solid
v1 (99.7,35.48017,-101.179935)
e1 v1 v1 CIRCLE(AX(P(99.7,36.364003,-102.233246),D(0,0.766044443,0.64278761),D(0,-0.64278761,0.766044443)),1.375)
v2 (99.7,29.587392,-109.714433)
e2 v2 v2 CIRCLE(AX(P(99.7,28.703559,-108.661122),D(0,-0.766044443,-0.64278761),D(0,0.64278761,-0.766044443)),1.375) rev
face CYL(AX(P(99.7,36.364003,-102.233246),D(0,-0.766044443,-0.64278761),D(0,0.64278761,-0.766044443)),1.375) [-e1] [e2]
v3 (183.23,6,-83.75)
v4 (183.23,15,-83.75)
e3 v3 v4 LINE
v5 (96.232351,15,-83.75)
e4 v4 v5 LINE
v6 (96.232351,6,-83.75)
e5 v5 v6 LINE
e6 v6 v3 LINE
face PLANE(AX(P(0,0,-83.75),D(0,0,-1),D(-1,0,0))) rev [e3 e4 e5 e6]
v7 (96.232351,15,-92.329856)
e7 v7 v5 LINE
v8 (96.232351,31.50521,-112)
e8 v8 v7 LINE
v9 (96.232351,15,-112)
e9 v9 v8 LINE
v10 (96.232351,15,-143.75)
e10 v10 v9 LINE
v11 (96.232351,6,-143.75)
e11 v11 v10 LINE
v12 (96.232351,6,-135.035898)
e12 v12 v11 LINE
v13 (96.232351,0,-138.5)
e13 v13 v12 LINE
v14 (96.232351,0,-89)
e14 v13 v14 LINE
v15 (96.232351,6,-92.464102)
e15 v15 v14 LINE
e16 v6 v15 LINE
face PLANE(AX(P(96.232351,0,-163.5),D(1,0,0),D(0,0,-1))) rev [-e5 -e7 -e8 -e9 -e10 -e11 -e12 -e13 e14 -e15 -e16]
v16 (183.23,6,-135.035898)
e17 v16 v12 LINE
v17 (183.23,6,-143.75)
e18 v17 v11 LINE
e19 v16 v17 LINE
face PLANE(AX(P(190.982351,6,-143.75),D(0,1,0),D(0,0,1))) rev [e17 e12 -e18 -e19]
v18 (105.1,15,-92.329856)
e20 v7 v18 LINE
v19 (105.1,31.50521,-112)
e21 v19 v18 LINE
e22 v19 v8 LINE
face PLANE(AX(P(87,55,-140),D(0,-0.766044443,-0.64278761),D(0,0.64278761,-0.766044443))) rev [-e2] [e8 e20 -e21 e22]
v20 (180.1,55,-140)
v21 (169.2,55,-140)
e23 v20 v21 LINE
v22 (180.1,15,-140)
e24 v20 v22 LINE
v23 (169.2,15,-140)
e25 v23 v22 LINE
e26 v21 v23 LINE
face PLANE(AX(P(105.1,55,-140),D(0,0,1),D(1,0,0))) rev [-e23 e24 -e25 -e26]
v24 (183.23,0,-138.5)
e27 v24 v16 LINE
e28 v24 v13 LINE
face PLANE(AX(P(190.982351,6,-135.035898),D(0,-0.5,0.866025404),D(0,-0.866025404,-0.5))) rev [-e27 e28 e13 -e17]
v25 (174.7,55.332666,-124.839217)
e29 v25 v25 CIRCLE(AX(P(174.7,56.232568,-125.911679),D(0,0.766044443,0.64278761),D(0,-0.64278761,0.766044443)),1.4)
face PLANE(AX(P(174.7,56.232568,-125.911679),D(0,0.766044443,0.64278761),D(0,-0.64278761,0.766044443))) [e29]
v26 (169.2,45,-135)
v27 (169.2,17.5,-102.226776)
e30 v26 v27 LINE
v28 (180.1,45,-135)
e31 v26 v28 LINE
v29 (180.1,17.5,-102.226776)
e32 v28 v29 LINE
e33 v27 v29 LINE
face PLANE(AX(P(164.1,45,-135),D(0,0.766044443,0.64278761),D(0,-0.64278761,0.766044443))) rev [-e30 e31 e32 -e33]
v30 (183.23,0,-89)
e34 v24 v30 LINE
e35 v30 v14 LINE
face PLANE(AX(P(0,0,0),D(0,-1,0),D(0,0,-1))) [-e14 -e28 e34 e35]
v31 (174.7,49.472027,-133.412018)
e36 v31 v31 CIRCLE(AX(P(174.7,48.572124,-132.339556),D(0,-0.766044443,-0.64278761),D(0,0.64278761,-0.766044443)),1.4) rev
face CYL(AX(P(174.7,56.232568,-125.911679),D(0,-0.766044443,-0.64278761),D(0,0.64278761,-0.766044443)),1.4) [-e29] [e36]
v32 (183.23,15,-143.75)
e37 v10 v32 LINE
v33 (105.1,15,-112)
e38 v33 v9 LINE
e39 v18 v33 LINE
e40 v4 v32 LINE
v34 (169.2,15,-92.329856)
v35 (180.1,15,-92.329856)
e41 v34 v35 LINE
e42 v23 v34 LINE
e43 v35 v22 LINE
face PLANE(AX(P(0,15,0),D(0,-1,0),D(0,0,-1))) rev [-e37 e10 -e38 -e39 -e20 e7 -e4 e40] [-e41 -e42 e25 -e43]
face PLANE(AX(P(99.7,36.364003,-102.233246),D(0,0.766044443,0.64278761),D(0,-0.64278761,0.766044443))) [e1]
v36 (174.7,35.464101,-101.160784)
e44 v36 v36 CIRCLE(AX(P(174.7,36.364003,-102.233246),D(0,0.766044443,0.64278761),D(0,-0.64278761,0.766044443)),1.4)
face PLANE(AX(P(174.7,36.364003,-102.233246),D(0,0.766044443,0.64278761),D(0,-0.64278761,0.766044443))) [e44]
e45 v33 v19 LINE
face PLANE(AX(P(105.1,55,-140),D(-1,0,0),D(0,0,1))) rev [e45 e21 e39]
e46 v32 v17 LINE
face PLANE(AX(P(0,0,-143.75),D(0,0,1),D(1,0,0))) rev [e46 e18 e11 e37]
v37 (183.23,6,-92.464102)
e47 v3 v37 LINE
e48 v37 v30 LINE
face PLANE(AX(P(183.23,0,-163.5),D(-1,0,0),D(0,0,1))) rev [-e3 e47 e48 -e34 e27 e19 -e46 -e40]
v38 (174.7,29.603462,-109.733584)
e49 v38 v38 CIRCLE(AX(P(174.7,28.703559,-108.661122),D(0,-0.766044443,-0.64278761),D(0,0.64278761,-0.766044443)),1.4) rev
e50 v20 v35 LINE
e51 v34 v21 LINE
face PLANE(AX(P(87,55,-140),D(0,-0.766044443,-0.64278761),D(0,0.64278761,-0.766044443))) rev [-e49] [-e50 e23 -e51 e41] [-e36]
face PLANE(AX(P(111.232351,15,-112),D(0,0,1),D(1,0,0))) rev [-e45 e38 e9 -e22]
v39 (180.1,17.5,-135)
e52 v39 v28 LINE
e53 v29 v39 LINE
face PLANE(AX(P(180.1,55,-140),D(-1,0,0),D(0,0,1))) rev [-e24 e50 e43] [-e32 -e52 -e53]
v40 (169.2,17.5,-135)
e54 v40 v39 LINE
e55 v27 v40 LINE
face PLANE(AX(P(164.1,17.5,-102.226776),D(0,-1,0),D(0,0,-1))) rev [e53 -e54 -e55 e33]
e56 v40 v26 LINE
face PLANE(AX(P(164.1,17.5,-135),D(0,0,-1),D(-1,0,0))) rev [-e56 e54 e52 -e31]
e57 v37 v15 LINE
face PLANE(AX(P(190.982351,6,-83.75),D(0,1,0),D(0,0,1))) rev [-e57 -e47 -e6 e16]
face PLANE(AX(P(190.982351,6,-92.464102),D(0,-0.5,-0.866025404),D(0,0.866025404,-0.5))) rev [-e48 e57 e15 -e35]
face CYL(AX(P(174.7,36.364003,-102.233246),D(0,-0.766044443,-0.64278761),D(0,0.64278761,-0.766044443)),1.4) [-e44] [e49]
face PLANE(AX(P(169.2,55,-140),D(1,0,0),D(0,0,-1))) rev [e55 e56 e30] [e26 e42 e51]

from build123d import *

# Parameters (mm, degrees)
SKETCH1_W              = 196
SKETCH1_H              = 150
BOSS_EXTRUDE1_DEPTH    = 15
SKETCH2_W              = 166
SKETCH2_H              = 55
CUT_EXTRUDE1_DEPTH     = 9.68
SKETCH3_R              = 1.5
BOSS_EXTRUDE2_DEPTH    = 10
SKETCH4_W              = 10.9
SKETCH4_H              = 64
BOSS_EXTRUDE3_DEPTH    = 40
CUT_EXTRUDE2_DEPTH     = 109
SKETCH6_R              = 1.4
SKETCH6_R_2            = 1.375
BOSS_EXTRUDE4_DEPTH    = 10
FILLET1_R              = 10
CUT_EXTRUDE4_START     = -15
CUT_EXTRUDE4_OUTLINE_R = 1.5
CUT_EXTRUDE4_DEPTH     = 15
SKETCH10_W             = 60
SKETCH10_H             = 37
CUT_EXTRUDE5_DEPTH     = 83
SKETCH11_W             = 10
SKETCH11_H             = 52.5
CUT_EXTRUDE6_DEPTH     = 36
SKETCH13_W             = 28
SKETCH13_H             = 42.5
CUT_EXTRUDE7_DEPTH     = 19
SKETCH19_W             = 4
SKETCH19_H             = 55
SKETCH19_W_2           = 2.77
SKETCH19_H_2           = 50
CUT_EXTRUDE9_DEPTH     = 76
SKETCH21_W             = 86.997648927
SKETCH21_H             = 15
BOSS_EXTRUDE6_DEPTH    = 3.75
SKETCH22_W             = 86.997648927
SKETCH22_H             = 15
BOSS_EXTRUDE7_DEPTH    = 3.75
CUT_EXTRUDE11_DEPTH    = 94.75
CUT_EXTRUDE12_DEPTH    = 16


# Read off the part's stored shape, not the designer's step: Cut-Extrude4
with BuildPart() as part:
    # Sketch1 → Boss-Extrude1 (new body)
    with BuildSketch(Plane(origin=(0, 0, 0), x_dir=(1, 0, 0), z_dir=(0, 1, 0))):
        with Locations((98, 75)):
            Rectangle(SKETCH1_W, SKETCH1_H)
    extrude(amount=BOSS_EXTRUDE1_DEPTH)

    # Sketch2 → Cut-Extrude1 (cut)
    with BuildSketch(Plane(origin=(0, 15, 0), x_dir=(1, 0, 0), z_dir=(0, 1, 0))):
        with Locations((98, 42.5)):
            Rectangle(SKETCH2_W, SKETCH2_H)
    extrude(amount=-CUT_EXTRUDE1_DEPTH, mode=Mode.SUBTRACT)

    # Sketch3 → Boss-Extrude2 (add)
    with BuildSketch(Plane(origin=(0, 15, 0), x_dir=(1, 0, 0), z_dir=(0, 1, 0))):
        with Locations(Location((25, 133.2, 0), (0, 0, 90))):
            Circle(SKETCH3_R)
        with Locations(Location((23.7, 85, 0), (0, 0, 90))):
            Circle(SKETCH3_R)
        with Locations(Location((75.8, 118, 0), (0, 0, 90))):
            Circle(SKETCH3_R)
        with Locations(Location((75.8, 90.1, 0), (0, 0, 90))):
            Circle(SKETCH3_R)
    extrude(amount=BOSS_EXTRUDE2_DEPTH)

    # Sketch4 → Boss-Extrude3 (add)
    with BuildSketch(Plane(origin=(0, 15, 0), x_dir=(1, 0, 0), z_dir=(0, 1, 0))):
        with Locations((99.65, 108)):
            Rectangle(SKETCH4_W, SKETCH4_H)
        with Locations((174.65, 108)):
            Rectangle(SKETCH4_W, SKETCH4_H)
    extrude(amount=BOSS_EXTRUDE3_DEPTH)

    # Sketch5 → Cut-Extrude2 (cut)
    with BuildSketch(Plane(origin=(196, 0, 0), x_dir=(0, 0, -1), z_dir=(1, 0, 0))):
        Polygon((140, 55), (92.329856296, 15), (75, 15), (75, 55), align=None)
    extrude(amount=-CUT_EXTRUDE2_DEPTH, mode=Mode.SUBTRACT)

    # Sketch6 → Boss-Extrude4 (add)
    with BuildSketch(Plane(origin=(0, -36.661217825, -30.762414355), x_dir=(1, 0, 0), z_dir=(0, 0.7660444431189771, 0.6427876096865404))):
        with Locations(Location((174.7, 132.599540569, 0), (0, 0, 90))):
            Circle(SKETCH6_R)
        with Locations(Location((174.7, 101.689540569, 0), (0, 0, 90))):
            Circle(SKETCH6_R)
        with Locations(Location((99.7, 132.599540569, 0), (0, 0, 90))):
            Circle(SKETCH6_R_2)
        with Locations(Location((99.7, 101.689540569, 0), (0, 0, 90))):
            Circle(SKETCH6_R_2)
    extrude(amount=BOSS_EXTRUDE4_DEPTH)

    # Fillet1
    fillet1_edges = [part.edges().sort_by_distance(p)[0] for p in [
        (196, 15, -75),
        (98, 15, -150),
        (0, 15, -75),
        (98, 15, 0),
    ]]
    fillet(fillet1_edges, radius=FILLET1_R - 0.0001)  # a hair under: the kernel refuses the full size

    # Cut-Extrude4 outline → Cut-Extrude4 (cut)
    with BuildSketch(Plane(origin=(0, 15, 0), x_dir=(1, 0, 0), z_dir=(0, 1, 0)).offset(CUT_EXTRUDE4_START)):
        Polygon((92.232351073, 87.5), (92.232351073, 140), (196, 140), (196, 150), (0, 150), (0, 0), (196, 0), (196, 87.5), align=None)
        with Locations((23.7, 85)):
            Circle(CUT_EXTRUDE4_OUTLINE_R, mode=Mode.SUBTRACT)
        with Locations((75.8, 90.1)):
            Circle(CUT_EXTRUDE4_OUTLINE_R, mode=Mode.SUBTRACT)
        with Locations((25, 133.2)):
            Circle(CUT_EXTRUDE4_OUTLINE_R, mode=Mode.SUBTRACT)
        with Locations((75.8, 118)):
            Circle(CUT_EXTRUDE4_OUTLINE_R, mode=Mode.SUBTRACT)
    extrude(amount=CUT_EXTRUDE4_DEPTH, mode=Mode.SUBTRACT)

    # Sketch10 → Cut-Extrude5 (cut)
    with BuildSketch(Plane.ZY.offset(-92.232351073)):
        with Locations((-110, 18.5)):
            Rectangle(SKETCH10_W, SKETCH10_H)
    extrude(amount=CUT_EXTRUDE5_DEPTH, mode=Mode.SUBTRACT)

    # Sketch11 → Cut-Extrude6 (cut)
    with BuildSketch(Plane(origin=(0, 15, 0), x_dir=(1, 0, 0), z_dir=(0, 1, 0))):
        with Locations((191, 113.75)):
            Rectangle(SKETCH11_W, SKETCH11_H)
    extrude(amount=-CUT_EXTRUDE6_DEPTH, mode=Mode.SUBTRACT)

    # Sketch13 → Cut-Extrude7 (cut)
    with BuildSketch(Plane.ZY.offset(-92.232351073)):
        with Locations((-126, 36.25)):
            Rectangle(SKETCH13_W, SKETCH13_H)
    extrude(amount=-CUT_EXTRUDE7_DEPTH, mode=Mode.SUBTRACT)

    # Sketch19 → Cut-Extrude9 (cut)
    with BuildSketch(Plane.XY.offset(-87.5)):
        with Locations((94.232351073, 27.5)):
            Rectangle(SKETCH19_W, SKETCH19_H)
        with Locations((184.615, 25)):
            Rectangle(SKETCH19_W_2, SKETCH19_H_2)
    extrude(amount=-CUT_EXTRUDE9_DEPTH, mode=Mode.SUBTRACT)

    # Sketch21 → Boss-Extrude6 (add)
    with BuildSketch(Plane(origin=(0, 0, -140), x_dir=(-1, 0, 0), z_dir=(0, 0, -1))):
        with Locations((-139.731175537, 7.5)):
            Rectangle(SKETCH21_W, SKETCH21_H)
    extrude(amount=BOSS_EXTRUDE6_DEPTH)

    # Sketch22 → Boss-Extrude7 (add)
    with BuildSketch(Plane.XY.offset(-87.5)):
        with Locations((139.731175537, 7.5)):
            Rectangle(SKETCH22_W, SKETCH22_H)
    extrude(amount=BOSS_EXTRUDE7_DEPTH)

    # Sketch23 → Cut-Extrude11 (cut)
    with BuildSketch(Plane.ZY.offset(-96.232351073)):
        Polygon((-143.75, 6), (-135.035898385, 6), (-138.5, 0), (-143.75, 0), align=None)
        Polygon((-83.75, 0), (-83.75, 6), (-92.464101615, 6), (-89, 0), align=None)
    extrude(amount=-CUT_EXTRUDE11_DEPTH, mode=Mode.SUBTRACT)

    # Sketch24 → Cut-Extrude12 (cut)
    with BuildSketch(Plane(origin=(180.1, 0, 0), x_dir=(0, 0, -1), z_dir=(1, 0, 0))):
        Polygon((135, 45), (102.226776204, 17.5), (135, 17.5), align=None)
    extrude(amount=-CUT_EXTRUDE12_DEPTH, mode=Mode.SUBTRACT)


solid = part.part
